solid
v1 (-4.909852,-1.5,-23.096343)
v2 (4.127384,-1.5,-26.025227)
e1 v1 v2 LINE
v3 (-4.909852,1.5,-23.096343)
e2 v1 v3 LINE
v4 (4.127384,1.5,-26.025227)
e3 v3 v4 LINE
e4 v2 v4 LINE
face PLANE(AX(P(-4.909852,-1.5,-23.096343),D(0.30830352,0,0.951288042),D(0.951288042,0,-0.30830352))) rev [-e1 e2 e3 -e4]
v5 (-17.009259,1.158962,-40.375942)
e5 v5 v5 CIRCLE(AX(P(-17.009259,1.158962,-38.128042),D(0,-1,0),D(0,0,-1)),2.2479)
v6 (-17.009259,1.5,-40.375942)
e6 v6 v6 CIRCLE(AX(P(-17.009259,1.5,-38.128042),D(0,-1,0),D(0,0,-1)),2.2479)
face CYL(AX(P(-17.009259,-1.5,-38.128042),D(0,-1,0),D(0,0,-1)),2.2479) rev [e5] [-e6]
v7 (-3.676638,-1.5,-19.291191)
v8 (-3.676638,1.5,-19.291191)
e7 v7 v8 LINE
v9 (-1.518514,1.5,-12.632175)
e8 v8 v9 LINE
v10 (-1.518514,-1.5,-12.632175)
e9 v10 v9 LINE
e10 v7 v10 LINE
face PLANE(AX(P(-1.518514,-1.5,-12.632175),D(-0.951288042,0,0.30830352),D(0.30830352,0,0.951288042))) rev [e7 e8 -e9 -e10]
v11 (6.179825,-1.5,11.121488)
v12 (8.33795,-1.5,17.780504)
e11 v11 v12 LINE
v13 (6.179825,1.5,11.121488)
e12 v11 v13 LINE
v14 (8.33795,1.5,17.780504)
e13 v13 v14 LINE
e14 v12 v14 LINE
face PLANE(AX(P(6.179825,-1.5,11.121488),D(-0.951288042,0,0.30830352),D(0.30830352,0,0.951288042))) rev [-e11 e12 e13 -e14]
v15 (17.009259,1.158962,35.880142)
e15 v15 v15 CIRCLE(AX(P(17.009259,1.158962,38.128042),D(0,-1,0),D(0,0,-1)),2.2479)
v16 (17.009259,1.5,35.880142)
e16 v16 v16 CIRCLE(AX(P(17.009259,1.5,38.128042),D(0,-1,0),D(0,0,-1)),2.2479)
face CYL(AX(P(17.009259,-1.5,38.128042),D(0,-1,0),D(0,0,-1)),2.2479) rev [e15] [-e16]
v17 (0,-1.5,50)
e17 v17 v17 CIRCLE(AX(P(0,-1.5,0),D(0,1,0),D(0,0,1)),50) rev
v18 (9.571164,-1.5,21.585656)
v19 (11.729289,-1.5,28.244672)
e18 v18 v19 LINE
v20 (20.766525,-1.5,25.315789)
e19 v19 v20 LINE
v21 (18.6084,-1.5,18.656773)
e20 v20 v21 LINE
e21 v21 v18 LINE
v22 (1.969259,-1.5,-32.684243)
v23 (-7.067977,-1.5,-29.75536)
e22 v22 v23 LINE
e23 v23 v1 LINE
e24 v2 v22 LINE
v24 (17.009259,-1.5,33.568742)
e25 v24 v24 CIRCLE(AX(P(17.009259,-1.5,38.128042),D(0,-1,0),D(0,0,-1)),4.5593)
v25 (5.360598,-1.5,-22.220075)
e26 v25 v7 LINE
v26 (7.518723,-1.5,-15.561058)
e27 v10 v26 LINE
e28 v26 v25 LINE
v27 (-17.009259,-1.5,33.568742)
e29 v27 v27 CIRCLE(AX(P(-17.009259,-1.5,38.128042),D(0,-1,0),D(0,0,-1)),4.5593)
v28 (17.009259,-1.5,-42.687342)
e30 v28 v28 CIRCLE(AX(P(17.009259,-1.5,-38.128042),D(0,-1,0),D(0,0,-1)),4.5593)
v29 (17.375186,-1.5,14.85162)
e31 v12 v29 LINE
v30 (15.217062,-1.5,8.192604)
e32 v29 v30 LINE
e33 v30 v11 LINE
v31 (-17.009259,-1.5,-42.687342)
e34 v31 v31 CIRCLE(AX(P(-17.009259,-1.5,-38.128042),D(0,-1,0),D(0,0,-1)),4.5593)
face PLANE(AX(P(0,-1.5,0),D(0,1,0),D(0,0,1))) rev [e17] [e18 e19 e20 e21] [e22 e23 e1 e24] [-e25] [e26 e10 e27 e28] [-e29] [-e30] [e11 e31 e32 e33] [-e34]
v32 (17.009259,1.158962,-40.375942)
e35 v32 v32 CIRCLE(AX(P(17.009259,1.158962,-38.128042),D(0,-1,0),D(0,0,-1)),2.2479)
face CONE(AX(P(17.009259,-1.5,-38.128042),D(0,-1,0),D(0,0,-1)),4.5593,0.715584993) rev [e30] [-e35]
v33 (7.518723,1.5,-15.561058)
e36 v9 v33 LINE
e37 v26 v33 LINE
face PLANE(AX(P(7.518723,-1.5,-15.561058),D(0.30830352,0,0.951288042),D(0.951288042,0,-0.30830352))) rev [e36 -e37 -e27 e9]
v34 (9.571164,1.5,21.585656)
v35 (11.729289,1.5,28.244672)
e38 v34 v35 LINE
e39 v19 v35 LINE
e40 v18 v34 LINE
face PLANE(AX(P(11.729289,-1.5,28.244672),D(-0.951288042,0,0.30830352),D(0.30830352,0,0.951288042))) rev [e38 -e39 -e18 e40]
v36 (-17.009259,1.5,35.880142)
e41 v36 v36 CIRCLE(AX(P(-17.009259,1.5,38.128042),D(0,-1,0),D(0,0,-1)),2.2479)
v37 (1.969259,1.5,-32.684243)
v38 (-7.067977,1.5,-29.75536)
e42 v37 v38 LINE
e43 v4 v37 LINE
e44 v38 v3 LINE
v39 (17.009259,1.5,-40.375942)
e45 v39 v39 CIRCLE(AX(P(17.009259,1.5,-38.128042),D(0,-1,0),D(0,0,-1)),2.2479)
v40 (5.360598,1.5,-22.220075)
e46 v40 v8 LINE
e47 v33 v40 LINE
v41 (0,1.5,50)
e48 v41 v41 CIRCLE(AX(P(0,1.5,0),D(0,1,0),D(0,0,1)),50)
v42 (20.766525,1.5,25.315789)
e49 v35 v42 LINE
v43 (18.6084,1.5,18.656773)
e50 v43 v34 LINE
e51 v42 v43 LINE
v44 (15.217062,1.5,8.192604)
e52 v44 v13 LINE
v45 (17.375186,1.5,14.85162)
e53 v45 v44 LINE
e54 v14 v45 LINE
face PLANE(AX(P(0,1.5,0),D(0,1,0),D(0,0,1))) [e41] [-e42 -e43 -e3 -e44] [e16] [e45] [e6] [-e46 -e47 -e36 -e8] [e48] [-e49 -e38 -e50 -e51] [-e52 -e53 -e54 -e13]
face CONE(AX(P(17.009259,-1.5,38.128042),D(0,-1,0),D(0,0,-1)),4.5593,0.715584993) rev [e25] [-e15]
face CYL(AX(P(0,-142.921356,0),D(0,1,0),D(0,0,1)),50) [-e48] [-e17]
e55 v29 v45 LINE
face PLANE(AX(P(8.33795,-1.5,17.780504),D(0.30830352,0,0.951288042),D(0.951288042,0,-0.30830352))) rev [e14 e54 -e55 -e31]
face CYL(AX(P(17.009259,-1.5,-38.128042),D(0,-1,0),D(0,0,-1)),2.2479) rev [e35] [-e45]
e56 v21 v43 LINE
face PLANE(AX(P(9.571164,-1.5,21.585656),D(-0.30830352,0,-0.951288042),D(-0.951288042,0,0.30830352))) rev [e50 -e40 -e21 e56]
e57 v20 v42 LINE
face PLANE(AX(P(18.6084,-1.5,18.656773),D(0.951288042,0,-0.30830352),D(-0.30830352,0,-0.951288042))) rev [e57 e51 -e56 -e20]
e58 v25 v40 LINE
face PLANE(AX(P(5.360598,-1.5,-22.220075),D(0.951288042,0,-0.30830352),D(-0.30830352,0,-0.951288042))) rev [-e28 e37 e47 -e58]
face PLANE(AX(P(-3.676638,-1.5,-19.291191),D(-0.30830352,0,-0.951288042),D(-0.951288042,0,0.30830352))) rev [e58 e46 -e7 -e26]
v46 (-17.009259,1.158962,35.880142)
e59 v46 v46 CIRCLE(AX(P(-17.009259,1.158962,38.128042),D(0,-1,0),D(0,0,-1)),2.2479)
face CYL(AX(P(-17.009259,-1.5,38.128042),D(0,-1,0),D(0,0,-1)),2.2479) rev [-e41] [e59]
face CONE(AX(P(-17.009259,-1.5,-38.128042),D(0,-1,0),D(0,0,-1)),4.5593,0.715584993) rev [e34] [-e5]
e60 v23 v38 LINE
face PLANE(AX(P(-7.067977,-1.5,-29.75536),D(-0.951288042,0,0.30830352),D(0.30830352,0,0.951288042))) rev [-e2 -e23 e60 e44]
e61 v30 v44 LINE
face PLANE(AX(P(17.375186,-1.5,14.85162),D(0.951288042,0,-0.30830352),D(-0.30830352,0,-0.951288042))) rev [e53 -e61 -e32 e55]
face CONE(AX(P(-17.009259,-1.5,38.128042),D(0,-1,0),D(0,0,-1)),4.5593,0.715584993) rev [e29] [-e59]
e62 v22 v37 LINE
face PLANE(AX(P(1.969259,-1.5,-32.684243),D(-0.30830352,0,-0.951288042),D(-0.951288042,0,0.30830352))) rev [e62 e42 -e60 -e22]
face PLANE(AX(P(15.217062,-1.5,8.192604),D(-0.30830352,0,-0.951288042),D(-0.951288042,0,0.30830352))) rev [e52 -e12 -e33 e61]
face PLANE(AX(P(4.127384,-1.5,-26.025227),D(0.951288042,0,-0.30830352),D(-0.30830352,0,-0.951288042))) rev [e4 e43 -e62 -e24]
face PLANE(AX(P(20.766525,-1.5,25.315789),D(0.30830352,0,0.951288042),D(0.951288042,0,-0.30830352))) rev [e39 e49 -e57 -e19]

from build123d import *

# Parameters (mm, degrees)
A_BASE_T_START                                = -1.5
A_BASE_T_OUTLINE_R                            = 47
A_BASE_T_OUTLINE_R_2                          = 1
A_BASE_T_DEPTH                                = 3
BASE_PULLEY_CUTOUT_DEPTH                      = 67.535704701
OUTER_START                                   = -3
SKETCH2_R                                     = 50
SKETCH2_R_2                                   = 47
OUTER_RING_DEPTH                              = 3
PATCHING_START                                = -3
SKETCH3_R                                     = 1
PATCHING_DEPTH                                = 3
CSK_FOR_8_FLAT_HEAD_SOCKET_CAP_SCREW1_A_COUNT = 2
CSK_FOR_8_FLAT_HEAD_SOCKET_CAP_SCREW1_A_PITCH = 34.018518517
CSK_FOR_8_FLAT_HEAD_SOCKET_CAP_SCRE_2_COUNT   = 2
CSK_FOR_8_FLAT_HEAD_SOCKET_CAP_SCRE_2_PITCH   = 83.5
CSK_FOR_8_FLAT_HEAD_SOCKET_CAP_SCRE_3_COUNT   = 2
CSK_FOR_8_FLAT_HEAD_SOCKET_CAP_SCRE_3_PITCH   = 76.256084334


# Read off the part's stored shape, not the designer's step: a_base_t
with BuildPart() as part:
    # a_base_t outline → a_base_t (new body)
    with BuildSketch(Plane(origin=(0, 0, 0), x_dir=(1, 0, 0), z_dir=(0, 1, 0)).offset(A_BASE_T_START)):
        Circle(A_BASE_T_OUTLINE_R)
        with Locations((-17.009259258, -38.128042167)):
            Circle(A_BASE_T_OUTLINE_R_2, mode=Mode.SUBTRACT)
        with Locations((-9.166666665, -28.284271247)):
            Circle(A_BASE_T_OUTLINE_R_2, mode=Mode.SUBTRACT)
        with Locations((17.009259258, -38.128042167)):
            Circle(A_BASE_T_OUTLINE_R_2, mode=Mode.SUBTRACT)
        with Locations((27.5, -28.284271247)):
            Circle(A_BASE_T_OUTLINE_R_2, mode=Mode.SUBTRACT)
        with Locations((-27.5, 28.284271247)):
            Circle(A_BASE_T_OUTLINE_R_2, mode=Mode.SUBTRACT)
        with Locations((-17.009259258, 38.128042167)):
            Circle(A_BASE_T_OUTLINE_R_2, mode=Mode.SUBTRACT)
        with Locations((9.166666665, 28.284271247)):
            Circle(A_BASE_T_OUTLINE_R_2, mode=Mode.SUBTRACT)
        with Locations((17.009259258, 38.128042167)):
            Circle(A_BASE_T_OUTLINE_R_2, mode=Mode.SUBTRACT)
    extrude(amount=A_BASE_T_DEPTH)

    # Sketch1 → Base Pulley Cutout (cut, through all)
    with BuildSketch(Plane(origin=(0, 1.5, 0), x_dir=(1, 0, 0), z_dir=(0, 1, 0))):
        Polygon((8.337949793, -17.780503881), (17.375186195, -14.85162044), (15.217061554, -8.192604143), (6.179825152, -11.121487584), align=None)
        Polygon((9.571163873, -21.58565605), (18.608400275, -18.656772609), (20.766524916, -25.315788906), (11.729288514, -28.244672346), align=None)
        Polygon((7.518722658, 15.561058274), (-1.518513745, 12.632174833), (-3.676638385, 19.291191129), (5.360598017, 22.22007457), align=None)
        Polygon((-4.909852466, 23.096343299), (4.127383937, 26.025226739), (1.969259296, 32.684243036), (-7.067977106, 29.755359595), align=None)
    extrude(amount=-BASE_PULLEY_CUTOUT_DEPTH, mode=Mode.SUBTRACT)

    # Sketch2 → Outer Ring (add)
    with BuildSketch(Plane(origin=(0, 1.5, 0), x_dir=(1, 0, 0), z_dir=(0, 1, 0)).offset(OUTER_START)):
        with Locations(Location((0, 0, 0), (0, 0, 270))):
            Circle(SKETCH2_R)
        Circle(SKETCH2_R_2, mode=Mode.SUBTRACT)
    extrude(amount=OUTER_RING_DEPTH)

    # Sketch3 → Patching (add)
    with BuildSketch(Plane(origin=(0, 1.5, 0), x_dir=(1, 0, 0), z_dir=(0, 1, 0)).offset(PATCHING_START)):
        with Locations((-9.166666665, -28.284271247)):
            Circle(SKETCH3_R)
        with Locations((-27.5, 28.284271247)):
            Circle(SKETCH3_R)
        with Locations((9.166666665, 28.284271247)):
            Circle(SKETCH3_R)
        with Locations((27.5, -28.284271247)):
            Circle(SKETCH3_R)
    extrude(amount=PATCHING_DEPTH)

    # Sketch6 → CSK for #8 Flat Head Socket Cap Screw1 (revolve, cut)
    with BuildSketch(Plane(origin=(17.009259258, -1.5, 38.128042167), x_dir=(0, 0, -1), z_dir=(1, 0, 0))):
        Polygon((0, 0), (0, 3), (2.2479, 3), (2.2479, 2.658961536), (4.5593, 0), align=None)
    csk_for_8_flat_head_socket_cap_screw1 = revolve(axis=Axis((17.009259258, -7.85, 38.128042167), (0, 1, 0)), mode=Mode.SUBTRACT)

    # CSK for #8 Flat Head Socket Cap Screw1 a: CSK for #8 Flat Head Socket Cap Screw1 ×2
    with Locations(*[(-i * CSK_FOR_8_FLAT_HEAD_SOCKET_CAP_SCREW1_A_PITCH, 0, 0) for i in range(1, CSK_FOR_8_FLAT_HEAD_SOCKET_CAP_SCREW1_A_COUNT)]):
        add(csk_for_8_flat_head_socket_cap_screw1, mode=Mode.SUBTRACT)

    # CSK for _8 Flat Head Socket Cap Scre 2: CSK for #8 Flat Head Socket Cap Screw1 ×2
    with Locations(*[Vector(-0.40740740738888753, 0, -0.9132465189666288) * (i * CSK_FOR_8_FLAT_HEAD_SOCKET_CAP_SCRE_2_PITCH) for i in range(1, CSK_FOR_8_FLAT_HEAD_SOCKET_CAP_SCRE_2_COUNT)]):
        add(csk_for_8_flat_head_socket_cap_screw1, mode=Mode.SUBTRACT)

    # CSK for _8 Flat Head Socket Cap Scre 3: CSK for #8 Flat Head Socket Cap Screw1 ×2
    with Locations(*[(0, 0, -i * CSK_FOR_8_FLAT_HEAD_SOCKET_CAP_SCRE_3_PITCH) for i in range(1, CSK_FOR_8_FLAT_HEAD_SOCKET_CAP_SCRE_3_COUNT)]):
        add(csk_for_8_flat_head_socket_cap_screw1, mode=Mode.SUBTRACT)


solid = part.part
